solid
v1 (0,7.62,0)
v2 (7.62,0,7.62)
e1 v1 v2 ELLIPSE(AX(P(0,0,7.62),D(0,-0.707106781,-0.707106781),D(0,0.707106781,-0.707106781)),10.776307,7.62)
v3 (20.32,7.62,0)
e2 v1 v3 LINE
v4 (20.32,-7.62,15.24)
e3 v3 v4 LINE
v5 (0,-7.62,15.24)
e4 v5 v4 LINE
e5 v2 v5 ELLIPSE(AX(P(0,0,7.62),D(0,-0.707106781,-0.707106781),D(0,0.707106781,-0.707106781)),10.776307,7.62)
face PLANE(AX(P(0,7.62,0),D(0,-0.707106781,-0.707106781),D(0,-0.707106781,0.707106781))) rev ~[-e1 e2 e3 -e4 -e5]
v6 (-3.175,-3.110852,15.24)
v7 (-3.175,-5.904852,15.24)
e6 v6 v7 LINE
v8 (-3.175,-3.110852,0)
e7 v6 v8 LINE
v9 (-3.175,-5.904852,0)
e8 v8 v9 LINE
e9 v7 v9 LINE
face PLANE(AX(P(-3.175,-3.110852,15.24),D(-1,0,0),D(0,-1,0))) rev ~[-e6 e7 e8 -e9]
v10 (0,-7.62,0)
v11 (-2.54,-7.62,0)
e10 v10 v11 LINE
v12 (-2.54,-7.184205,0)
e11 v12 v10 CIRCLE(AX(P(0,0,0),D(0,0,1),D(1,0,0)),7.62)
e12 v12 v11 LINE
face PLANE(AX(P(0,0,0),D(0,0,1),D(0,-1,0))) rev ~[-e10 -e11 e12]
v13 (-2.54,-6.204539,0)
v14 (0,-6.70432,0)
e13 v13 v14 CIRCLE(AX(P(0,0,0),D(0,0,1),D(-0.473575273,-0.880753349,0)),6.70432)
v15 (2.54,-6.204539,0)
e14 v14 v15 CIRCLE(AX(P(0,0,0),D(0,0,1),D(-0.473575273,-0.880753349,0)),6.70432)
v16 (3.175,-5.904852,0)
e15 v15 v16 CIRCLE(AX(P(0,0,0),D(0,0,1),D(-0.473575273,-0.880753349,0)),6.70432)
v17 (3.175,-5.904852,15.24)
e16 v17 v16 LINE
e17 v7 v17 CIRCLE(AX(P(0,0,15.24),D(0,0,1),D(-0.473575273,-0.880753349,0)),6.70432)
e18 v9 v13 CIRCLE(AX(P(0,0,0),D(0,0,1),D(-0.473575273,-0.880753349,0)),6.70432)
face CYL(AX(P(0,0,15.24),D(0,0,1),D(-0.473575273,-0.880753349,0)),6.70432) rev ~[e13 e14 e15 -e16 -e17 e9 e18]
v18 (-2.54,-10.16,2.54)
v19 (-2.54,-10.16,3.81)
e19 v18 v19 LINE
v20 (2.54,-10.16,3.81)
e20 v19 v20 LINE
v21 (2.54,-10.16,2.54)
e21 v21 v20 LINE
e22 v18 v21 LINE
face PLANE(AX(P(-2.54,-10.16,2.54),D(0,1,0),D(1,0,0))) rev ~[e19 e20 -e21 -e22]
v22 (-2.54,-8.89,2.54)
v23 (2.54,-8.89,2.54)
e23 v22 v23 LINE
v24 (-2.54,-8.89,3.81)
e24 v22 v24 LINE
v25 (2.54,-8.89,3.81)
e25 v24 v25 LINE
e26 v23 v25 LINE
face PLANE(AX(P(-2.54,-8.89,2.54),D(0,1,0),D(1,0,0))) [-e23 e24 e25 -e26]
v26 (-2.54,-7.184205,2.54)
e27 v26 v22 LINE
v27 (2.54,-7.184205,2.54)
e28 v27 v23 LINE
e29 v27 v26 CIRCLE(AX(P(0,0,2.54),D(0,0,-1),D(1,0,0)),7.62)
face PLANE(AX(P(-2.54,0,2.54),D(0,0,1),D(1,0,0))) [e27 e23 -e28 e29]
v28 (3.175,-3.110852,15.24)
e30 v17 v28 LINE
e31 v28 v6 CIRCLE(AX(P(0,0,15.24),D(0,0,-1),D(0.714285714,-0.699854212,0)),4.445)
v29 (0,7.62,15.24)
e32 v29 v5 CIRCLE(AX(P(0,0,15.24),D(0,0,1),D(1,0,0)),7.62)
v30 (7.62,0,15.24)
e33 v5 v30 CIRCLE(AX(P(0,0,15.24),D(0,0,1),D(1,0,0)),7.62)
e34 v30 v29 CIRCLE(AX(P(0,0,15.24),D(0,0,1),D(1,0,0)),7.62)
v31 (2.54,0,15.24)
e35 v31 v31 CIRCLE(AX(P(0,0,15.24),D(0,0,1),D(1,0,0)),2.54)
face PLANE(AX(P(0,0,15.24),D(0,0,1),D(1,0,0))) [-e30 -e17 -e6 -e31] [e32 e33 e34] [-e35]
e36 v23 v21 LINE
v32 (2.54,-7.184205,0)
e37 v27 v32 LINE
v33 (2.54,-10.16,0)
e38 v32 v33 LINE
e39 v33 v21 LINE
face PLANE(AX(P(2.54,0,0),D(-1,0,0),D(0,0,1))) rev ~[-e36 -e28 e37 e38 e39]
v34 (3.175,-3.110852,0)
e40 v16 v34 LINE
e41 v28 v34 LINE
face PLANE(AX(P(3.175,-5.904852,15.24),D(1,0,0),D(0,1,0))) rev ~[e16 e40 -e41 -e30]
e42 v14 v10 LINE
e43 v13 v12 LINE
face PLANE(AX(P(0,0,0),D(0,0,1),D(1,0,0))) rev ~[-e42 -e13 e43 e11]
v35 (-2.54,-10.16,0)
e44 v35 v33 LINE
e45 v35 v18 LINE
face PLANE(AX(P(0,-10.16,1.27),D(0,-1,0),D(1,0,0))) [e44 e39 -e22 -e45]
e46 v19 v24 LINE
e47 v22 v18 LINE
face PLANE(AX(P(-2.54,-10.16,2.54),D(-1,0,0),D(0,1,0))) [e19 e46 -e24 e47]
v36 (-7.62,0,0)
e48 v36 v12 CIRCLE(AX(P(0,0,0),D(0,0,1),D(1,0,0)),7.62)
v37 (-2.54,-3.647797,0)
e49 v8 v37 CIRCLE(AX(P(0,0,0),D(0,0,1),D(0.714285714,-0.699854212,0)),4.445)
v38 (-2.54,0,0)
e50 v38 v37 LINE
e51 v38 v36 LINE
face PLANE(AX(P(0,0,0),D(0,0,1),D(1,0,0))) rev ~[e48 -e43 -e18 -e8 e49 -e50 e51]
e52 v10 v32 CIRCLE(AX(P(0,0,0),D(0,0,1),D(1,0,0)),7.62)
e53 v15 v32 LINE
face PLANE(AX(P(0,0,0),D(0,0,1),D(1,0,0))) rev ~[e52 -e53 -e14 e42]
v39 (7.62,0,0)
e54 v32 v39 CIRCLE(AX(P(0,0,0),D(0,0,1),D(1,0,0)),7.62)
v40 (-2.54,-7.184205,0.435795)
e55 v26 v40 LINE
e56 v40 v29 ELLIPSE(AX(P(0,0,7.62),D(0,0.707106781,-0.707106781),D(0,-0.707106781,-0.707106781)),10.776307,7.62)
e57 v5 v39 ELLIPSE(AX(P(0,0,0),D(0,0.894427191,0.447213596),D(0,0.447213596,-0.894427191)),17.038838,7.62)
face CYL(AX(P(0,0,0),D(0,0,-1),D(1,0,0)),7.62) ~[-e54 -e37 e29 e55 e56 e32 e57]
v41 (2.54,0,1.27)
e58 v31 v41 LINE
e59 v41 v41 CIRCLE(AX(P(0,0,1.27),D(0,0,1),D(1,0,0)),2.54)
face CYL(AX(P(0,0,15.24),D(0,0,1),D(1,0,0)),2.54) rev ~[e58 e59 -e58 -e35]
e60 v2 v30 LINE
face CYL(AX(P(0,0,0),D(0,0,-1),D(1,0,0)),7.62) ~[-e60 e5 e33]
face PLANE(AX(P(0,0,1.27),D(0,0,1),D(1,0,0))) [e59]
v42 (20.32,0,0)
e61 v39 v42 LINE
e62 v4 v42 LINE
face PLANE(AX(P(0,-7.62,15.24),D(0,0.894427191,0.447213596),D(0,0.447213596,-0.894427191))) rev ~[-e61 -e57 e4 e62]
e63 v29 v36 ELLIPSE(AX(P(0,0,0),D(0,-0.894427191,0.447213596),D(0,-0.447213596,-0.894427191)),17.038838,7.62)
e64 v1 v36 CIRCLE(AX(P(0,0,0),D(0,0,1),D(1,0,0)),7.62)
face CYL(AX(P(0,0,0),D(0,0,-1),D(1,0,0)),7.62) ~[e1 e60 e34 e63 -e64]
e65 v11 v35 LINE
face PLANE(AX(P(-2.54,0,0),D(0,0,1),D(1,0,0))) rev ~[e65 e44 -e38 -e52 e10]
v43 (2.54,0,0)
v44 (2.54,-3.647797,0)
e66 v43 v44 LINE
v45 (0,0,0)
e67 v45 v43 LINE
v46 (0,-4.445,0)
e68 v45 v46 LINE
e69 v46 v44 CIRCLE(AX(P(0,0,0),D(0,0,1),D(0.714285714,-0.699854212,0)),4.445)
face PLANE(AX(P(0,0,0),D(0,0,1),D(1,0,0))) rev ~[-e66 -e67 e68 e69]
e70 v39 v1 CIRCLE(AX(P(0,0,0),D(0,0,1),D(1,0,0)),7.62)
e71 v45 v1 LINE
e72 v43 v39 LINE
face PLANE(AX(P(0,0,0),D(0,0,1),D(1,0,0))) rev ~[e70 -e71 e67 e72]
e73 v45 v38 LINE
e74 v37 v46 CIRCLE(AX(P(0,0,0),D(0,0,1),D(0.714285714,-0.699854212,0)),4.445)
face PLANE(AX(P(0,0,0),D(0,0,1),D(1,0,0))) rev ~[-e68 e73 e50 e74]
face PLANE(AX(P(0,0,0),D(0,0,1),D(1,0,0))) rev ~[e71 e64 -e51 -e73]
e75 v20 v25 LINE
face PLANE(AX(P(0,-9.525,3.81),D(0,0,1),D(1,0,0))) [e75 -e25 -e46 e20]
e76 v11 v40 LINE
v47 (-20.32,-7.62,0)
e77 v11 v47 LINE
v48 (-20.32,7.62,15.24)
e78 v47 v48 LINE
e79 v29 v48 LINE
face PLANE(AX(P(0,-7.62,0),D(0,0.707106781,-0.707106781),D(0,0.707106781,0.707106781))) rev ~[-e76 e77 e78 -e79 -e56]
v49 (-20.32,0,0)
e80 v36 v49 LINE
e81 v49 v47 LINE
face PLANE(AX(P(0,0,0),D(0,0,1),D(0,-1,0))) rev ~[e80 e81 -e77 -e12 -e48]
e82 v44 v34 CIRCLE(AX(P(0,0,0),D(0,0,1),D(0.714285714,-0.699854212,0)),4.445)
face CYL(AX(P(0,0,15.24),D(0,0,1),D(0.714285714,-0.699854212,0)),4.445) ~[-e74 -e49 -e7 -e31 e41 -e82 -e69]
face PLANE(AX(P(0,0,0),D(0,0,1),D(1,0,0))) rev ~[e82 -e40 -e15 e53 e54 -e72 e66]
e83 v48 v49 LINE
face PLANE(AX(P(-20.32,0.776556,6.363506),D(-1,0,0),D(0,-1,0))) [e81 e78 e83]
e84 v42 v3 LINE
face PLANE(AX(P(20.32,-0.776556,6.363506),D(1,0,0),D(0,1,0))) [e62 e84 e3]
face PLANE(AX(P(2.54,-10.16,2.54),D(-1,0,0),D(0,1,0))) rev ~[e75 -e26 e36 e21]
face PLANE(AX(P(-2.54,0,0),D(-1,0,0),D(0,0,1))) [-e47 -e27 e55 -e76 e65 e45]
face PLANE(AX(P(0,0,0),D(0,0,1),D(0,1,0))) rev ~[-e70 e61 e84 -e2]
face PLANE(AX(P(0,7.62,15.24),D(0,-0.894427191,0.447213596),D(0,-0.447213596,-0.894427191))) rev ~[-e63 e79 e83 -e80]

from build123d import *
from build123d import SkipClean  # not in build123d's __all__

# Parameters (mm, degrees)
F0_R      = 7.62
F1_DEPTH  = 15.24
F3_DEPTH  = 20.32
F5_COUNT  = 2
F6_W      = 5.0799995622
F6_H      = 2.54
F7_DEPTH  = 10.16
F8_W      = 5.0799995622
F8_H      = 1.27
F9_DEPTH  = 1.27
F10_R     = 2.54
F11_DEPTH = 13.97
F13_DEPTH = 25.4


with BuildPart() as f1:
    # F0 (on Top) → F1 (new body)
    with BuildSketch(Plane.XY):
        Circle(F0_R)
    extrude(amount=F1_DEPTH)



with BuildPart() as f3:
    # F2 (on Right) → F3 (new body)
    with BuildSketch(Plane.YZ):
        Polygon((-7.62, 15.24), (0, 0), (7.62, 0), align=None)
    extrude(amount=F3_DEPTH)


with BuildPart() as f1_1:
    add(f1.part, clean=False)

    with SkipClean():  # cleaning this boolean's faces spoils the solid; the shape is the same uncleaned
        add(f3.part)  # F5 merges F3
    # F5: F3 ×2 about axis
    f5_axis = Axis((0, 0, 17.5851359963), (0, 0, 1))
    with SkipClean():  # cleaning this boolean's faces spoils the solid; the shape is the same uncleaned
        for i in range(1, F5_COUNT):
            add(f3.part.rotate(f5_axis, i * 360 / F5_COUNT), clean=False)

    # F6 (on Front) → F7 (join)
    with BuildSketch(Plane.XZ):
        with Locations((0, 1.27)):
            Rectangle(F6_W, F6_H)
    with SkipClean():  # cleaning this boolean's faces spoils the solid; the shape is the same uncleaned
        extrude(amount=F7_DEPTH)

    # F8 (on face) → F9 (join)
    with BuildSketch(Plane.XY.offset(2.54)):
        with Locations((0, -9.525)):
            Rectangle(F8_W, F8_H)
    with SkipClean():  # cleaning this boolean's faces spoils the solid; the shape is the same uncleaned
        extrude(amount=F9_DEPTH)

    # F10 (on face) → F11 (cut)
    with BuildSketch(Plane.XY.offset(15.24)):
        Circle(F10_R)
    with SkipClean():  # cleaning this boolean's faces spoils the solid; the shape is the same uncleaned
        extrude(amount=-F11_DEPTH, mode=Mode.SUBTRACT)

    # F12 (on face) → F13 (cut)
    with BuildSketch(Plane.XY.offset(15.24)):
        with BuildLine():
            ThreePointArc((3.175, -3.1108519733), (0, -4.445), (-3.175, -3.1108519733))
            Line((-3.175, -3.1108519733), (-3.175, -5.9048519733))
            ThreePointArc((-3.175, -5.9048519733), (0, -6.7043196394), (3.175, -5.9048519733))
            Line((3.175, -5.9048519733), (3.175, -3.1108519733))
        make_face()
    with SkipClean():  # cleaning this boolean's faces spoils the solid; the shape is the same uncleaned
        extrude(amount=-F13_DEPTH, mode=Mode.SUBTRACT)


solid = f1_1.part
